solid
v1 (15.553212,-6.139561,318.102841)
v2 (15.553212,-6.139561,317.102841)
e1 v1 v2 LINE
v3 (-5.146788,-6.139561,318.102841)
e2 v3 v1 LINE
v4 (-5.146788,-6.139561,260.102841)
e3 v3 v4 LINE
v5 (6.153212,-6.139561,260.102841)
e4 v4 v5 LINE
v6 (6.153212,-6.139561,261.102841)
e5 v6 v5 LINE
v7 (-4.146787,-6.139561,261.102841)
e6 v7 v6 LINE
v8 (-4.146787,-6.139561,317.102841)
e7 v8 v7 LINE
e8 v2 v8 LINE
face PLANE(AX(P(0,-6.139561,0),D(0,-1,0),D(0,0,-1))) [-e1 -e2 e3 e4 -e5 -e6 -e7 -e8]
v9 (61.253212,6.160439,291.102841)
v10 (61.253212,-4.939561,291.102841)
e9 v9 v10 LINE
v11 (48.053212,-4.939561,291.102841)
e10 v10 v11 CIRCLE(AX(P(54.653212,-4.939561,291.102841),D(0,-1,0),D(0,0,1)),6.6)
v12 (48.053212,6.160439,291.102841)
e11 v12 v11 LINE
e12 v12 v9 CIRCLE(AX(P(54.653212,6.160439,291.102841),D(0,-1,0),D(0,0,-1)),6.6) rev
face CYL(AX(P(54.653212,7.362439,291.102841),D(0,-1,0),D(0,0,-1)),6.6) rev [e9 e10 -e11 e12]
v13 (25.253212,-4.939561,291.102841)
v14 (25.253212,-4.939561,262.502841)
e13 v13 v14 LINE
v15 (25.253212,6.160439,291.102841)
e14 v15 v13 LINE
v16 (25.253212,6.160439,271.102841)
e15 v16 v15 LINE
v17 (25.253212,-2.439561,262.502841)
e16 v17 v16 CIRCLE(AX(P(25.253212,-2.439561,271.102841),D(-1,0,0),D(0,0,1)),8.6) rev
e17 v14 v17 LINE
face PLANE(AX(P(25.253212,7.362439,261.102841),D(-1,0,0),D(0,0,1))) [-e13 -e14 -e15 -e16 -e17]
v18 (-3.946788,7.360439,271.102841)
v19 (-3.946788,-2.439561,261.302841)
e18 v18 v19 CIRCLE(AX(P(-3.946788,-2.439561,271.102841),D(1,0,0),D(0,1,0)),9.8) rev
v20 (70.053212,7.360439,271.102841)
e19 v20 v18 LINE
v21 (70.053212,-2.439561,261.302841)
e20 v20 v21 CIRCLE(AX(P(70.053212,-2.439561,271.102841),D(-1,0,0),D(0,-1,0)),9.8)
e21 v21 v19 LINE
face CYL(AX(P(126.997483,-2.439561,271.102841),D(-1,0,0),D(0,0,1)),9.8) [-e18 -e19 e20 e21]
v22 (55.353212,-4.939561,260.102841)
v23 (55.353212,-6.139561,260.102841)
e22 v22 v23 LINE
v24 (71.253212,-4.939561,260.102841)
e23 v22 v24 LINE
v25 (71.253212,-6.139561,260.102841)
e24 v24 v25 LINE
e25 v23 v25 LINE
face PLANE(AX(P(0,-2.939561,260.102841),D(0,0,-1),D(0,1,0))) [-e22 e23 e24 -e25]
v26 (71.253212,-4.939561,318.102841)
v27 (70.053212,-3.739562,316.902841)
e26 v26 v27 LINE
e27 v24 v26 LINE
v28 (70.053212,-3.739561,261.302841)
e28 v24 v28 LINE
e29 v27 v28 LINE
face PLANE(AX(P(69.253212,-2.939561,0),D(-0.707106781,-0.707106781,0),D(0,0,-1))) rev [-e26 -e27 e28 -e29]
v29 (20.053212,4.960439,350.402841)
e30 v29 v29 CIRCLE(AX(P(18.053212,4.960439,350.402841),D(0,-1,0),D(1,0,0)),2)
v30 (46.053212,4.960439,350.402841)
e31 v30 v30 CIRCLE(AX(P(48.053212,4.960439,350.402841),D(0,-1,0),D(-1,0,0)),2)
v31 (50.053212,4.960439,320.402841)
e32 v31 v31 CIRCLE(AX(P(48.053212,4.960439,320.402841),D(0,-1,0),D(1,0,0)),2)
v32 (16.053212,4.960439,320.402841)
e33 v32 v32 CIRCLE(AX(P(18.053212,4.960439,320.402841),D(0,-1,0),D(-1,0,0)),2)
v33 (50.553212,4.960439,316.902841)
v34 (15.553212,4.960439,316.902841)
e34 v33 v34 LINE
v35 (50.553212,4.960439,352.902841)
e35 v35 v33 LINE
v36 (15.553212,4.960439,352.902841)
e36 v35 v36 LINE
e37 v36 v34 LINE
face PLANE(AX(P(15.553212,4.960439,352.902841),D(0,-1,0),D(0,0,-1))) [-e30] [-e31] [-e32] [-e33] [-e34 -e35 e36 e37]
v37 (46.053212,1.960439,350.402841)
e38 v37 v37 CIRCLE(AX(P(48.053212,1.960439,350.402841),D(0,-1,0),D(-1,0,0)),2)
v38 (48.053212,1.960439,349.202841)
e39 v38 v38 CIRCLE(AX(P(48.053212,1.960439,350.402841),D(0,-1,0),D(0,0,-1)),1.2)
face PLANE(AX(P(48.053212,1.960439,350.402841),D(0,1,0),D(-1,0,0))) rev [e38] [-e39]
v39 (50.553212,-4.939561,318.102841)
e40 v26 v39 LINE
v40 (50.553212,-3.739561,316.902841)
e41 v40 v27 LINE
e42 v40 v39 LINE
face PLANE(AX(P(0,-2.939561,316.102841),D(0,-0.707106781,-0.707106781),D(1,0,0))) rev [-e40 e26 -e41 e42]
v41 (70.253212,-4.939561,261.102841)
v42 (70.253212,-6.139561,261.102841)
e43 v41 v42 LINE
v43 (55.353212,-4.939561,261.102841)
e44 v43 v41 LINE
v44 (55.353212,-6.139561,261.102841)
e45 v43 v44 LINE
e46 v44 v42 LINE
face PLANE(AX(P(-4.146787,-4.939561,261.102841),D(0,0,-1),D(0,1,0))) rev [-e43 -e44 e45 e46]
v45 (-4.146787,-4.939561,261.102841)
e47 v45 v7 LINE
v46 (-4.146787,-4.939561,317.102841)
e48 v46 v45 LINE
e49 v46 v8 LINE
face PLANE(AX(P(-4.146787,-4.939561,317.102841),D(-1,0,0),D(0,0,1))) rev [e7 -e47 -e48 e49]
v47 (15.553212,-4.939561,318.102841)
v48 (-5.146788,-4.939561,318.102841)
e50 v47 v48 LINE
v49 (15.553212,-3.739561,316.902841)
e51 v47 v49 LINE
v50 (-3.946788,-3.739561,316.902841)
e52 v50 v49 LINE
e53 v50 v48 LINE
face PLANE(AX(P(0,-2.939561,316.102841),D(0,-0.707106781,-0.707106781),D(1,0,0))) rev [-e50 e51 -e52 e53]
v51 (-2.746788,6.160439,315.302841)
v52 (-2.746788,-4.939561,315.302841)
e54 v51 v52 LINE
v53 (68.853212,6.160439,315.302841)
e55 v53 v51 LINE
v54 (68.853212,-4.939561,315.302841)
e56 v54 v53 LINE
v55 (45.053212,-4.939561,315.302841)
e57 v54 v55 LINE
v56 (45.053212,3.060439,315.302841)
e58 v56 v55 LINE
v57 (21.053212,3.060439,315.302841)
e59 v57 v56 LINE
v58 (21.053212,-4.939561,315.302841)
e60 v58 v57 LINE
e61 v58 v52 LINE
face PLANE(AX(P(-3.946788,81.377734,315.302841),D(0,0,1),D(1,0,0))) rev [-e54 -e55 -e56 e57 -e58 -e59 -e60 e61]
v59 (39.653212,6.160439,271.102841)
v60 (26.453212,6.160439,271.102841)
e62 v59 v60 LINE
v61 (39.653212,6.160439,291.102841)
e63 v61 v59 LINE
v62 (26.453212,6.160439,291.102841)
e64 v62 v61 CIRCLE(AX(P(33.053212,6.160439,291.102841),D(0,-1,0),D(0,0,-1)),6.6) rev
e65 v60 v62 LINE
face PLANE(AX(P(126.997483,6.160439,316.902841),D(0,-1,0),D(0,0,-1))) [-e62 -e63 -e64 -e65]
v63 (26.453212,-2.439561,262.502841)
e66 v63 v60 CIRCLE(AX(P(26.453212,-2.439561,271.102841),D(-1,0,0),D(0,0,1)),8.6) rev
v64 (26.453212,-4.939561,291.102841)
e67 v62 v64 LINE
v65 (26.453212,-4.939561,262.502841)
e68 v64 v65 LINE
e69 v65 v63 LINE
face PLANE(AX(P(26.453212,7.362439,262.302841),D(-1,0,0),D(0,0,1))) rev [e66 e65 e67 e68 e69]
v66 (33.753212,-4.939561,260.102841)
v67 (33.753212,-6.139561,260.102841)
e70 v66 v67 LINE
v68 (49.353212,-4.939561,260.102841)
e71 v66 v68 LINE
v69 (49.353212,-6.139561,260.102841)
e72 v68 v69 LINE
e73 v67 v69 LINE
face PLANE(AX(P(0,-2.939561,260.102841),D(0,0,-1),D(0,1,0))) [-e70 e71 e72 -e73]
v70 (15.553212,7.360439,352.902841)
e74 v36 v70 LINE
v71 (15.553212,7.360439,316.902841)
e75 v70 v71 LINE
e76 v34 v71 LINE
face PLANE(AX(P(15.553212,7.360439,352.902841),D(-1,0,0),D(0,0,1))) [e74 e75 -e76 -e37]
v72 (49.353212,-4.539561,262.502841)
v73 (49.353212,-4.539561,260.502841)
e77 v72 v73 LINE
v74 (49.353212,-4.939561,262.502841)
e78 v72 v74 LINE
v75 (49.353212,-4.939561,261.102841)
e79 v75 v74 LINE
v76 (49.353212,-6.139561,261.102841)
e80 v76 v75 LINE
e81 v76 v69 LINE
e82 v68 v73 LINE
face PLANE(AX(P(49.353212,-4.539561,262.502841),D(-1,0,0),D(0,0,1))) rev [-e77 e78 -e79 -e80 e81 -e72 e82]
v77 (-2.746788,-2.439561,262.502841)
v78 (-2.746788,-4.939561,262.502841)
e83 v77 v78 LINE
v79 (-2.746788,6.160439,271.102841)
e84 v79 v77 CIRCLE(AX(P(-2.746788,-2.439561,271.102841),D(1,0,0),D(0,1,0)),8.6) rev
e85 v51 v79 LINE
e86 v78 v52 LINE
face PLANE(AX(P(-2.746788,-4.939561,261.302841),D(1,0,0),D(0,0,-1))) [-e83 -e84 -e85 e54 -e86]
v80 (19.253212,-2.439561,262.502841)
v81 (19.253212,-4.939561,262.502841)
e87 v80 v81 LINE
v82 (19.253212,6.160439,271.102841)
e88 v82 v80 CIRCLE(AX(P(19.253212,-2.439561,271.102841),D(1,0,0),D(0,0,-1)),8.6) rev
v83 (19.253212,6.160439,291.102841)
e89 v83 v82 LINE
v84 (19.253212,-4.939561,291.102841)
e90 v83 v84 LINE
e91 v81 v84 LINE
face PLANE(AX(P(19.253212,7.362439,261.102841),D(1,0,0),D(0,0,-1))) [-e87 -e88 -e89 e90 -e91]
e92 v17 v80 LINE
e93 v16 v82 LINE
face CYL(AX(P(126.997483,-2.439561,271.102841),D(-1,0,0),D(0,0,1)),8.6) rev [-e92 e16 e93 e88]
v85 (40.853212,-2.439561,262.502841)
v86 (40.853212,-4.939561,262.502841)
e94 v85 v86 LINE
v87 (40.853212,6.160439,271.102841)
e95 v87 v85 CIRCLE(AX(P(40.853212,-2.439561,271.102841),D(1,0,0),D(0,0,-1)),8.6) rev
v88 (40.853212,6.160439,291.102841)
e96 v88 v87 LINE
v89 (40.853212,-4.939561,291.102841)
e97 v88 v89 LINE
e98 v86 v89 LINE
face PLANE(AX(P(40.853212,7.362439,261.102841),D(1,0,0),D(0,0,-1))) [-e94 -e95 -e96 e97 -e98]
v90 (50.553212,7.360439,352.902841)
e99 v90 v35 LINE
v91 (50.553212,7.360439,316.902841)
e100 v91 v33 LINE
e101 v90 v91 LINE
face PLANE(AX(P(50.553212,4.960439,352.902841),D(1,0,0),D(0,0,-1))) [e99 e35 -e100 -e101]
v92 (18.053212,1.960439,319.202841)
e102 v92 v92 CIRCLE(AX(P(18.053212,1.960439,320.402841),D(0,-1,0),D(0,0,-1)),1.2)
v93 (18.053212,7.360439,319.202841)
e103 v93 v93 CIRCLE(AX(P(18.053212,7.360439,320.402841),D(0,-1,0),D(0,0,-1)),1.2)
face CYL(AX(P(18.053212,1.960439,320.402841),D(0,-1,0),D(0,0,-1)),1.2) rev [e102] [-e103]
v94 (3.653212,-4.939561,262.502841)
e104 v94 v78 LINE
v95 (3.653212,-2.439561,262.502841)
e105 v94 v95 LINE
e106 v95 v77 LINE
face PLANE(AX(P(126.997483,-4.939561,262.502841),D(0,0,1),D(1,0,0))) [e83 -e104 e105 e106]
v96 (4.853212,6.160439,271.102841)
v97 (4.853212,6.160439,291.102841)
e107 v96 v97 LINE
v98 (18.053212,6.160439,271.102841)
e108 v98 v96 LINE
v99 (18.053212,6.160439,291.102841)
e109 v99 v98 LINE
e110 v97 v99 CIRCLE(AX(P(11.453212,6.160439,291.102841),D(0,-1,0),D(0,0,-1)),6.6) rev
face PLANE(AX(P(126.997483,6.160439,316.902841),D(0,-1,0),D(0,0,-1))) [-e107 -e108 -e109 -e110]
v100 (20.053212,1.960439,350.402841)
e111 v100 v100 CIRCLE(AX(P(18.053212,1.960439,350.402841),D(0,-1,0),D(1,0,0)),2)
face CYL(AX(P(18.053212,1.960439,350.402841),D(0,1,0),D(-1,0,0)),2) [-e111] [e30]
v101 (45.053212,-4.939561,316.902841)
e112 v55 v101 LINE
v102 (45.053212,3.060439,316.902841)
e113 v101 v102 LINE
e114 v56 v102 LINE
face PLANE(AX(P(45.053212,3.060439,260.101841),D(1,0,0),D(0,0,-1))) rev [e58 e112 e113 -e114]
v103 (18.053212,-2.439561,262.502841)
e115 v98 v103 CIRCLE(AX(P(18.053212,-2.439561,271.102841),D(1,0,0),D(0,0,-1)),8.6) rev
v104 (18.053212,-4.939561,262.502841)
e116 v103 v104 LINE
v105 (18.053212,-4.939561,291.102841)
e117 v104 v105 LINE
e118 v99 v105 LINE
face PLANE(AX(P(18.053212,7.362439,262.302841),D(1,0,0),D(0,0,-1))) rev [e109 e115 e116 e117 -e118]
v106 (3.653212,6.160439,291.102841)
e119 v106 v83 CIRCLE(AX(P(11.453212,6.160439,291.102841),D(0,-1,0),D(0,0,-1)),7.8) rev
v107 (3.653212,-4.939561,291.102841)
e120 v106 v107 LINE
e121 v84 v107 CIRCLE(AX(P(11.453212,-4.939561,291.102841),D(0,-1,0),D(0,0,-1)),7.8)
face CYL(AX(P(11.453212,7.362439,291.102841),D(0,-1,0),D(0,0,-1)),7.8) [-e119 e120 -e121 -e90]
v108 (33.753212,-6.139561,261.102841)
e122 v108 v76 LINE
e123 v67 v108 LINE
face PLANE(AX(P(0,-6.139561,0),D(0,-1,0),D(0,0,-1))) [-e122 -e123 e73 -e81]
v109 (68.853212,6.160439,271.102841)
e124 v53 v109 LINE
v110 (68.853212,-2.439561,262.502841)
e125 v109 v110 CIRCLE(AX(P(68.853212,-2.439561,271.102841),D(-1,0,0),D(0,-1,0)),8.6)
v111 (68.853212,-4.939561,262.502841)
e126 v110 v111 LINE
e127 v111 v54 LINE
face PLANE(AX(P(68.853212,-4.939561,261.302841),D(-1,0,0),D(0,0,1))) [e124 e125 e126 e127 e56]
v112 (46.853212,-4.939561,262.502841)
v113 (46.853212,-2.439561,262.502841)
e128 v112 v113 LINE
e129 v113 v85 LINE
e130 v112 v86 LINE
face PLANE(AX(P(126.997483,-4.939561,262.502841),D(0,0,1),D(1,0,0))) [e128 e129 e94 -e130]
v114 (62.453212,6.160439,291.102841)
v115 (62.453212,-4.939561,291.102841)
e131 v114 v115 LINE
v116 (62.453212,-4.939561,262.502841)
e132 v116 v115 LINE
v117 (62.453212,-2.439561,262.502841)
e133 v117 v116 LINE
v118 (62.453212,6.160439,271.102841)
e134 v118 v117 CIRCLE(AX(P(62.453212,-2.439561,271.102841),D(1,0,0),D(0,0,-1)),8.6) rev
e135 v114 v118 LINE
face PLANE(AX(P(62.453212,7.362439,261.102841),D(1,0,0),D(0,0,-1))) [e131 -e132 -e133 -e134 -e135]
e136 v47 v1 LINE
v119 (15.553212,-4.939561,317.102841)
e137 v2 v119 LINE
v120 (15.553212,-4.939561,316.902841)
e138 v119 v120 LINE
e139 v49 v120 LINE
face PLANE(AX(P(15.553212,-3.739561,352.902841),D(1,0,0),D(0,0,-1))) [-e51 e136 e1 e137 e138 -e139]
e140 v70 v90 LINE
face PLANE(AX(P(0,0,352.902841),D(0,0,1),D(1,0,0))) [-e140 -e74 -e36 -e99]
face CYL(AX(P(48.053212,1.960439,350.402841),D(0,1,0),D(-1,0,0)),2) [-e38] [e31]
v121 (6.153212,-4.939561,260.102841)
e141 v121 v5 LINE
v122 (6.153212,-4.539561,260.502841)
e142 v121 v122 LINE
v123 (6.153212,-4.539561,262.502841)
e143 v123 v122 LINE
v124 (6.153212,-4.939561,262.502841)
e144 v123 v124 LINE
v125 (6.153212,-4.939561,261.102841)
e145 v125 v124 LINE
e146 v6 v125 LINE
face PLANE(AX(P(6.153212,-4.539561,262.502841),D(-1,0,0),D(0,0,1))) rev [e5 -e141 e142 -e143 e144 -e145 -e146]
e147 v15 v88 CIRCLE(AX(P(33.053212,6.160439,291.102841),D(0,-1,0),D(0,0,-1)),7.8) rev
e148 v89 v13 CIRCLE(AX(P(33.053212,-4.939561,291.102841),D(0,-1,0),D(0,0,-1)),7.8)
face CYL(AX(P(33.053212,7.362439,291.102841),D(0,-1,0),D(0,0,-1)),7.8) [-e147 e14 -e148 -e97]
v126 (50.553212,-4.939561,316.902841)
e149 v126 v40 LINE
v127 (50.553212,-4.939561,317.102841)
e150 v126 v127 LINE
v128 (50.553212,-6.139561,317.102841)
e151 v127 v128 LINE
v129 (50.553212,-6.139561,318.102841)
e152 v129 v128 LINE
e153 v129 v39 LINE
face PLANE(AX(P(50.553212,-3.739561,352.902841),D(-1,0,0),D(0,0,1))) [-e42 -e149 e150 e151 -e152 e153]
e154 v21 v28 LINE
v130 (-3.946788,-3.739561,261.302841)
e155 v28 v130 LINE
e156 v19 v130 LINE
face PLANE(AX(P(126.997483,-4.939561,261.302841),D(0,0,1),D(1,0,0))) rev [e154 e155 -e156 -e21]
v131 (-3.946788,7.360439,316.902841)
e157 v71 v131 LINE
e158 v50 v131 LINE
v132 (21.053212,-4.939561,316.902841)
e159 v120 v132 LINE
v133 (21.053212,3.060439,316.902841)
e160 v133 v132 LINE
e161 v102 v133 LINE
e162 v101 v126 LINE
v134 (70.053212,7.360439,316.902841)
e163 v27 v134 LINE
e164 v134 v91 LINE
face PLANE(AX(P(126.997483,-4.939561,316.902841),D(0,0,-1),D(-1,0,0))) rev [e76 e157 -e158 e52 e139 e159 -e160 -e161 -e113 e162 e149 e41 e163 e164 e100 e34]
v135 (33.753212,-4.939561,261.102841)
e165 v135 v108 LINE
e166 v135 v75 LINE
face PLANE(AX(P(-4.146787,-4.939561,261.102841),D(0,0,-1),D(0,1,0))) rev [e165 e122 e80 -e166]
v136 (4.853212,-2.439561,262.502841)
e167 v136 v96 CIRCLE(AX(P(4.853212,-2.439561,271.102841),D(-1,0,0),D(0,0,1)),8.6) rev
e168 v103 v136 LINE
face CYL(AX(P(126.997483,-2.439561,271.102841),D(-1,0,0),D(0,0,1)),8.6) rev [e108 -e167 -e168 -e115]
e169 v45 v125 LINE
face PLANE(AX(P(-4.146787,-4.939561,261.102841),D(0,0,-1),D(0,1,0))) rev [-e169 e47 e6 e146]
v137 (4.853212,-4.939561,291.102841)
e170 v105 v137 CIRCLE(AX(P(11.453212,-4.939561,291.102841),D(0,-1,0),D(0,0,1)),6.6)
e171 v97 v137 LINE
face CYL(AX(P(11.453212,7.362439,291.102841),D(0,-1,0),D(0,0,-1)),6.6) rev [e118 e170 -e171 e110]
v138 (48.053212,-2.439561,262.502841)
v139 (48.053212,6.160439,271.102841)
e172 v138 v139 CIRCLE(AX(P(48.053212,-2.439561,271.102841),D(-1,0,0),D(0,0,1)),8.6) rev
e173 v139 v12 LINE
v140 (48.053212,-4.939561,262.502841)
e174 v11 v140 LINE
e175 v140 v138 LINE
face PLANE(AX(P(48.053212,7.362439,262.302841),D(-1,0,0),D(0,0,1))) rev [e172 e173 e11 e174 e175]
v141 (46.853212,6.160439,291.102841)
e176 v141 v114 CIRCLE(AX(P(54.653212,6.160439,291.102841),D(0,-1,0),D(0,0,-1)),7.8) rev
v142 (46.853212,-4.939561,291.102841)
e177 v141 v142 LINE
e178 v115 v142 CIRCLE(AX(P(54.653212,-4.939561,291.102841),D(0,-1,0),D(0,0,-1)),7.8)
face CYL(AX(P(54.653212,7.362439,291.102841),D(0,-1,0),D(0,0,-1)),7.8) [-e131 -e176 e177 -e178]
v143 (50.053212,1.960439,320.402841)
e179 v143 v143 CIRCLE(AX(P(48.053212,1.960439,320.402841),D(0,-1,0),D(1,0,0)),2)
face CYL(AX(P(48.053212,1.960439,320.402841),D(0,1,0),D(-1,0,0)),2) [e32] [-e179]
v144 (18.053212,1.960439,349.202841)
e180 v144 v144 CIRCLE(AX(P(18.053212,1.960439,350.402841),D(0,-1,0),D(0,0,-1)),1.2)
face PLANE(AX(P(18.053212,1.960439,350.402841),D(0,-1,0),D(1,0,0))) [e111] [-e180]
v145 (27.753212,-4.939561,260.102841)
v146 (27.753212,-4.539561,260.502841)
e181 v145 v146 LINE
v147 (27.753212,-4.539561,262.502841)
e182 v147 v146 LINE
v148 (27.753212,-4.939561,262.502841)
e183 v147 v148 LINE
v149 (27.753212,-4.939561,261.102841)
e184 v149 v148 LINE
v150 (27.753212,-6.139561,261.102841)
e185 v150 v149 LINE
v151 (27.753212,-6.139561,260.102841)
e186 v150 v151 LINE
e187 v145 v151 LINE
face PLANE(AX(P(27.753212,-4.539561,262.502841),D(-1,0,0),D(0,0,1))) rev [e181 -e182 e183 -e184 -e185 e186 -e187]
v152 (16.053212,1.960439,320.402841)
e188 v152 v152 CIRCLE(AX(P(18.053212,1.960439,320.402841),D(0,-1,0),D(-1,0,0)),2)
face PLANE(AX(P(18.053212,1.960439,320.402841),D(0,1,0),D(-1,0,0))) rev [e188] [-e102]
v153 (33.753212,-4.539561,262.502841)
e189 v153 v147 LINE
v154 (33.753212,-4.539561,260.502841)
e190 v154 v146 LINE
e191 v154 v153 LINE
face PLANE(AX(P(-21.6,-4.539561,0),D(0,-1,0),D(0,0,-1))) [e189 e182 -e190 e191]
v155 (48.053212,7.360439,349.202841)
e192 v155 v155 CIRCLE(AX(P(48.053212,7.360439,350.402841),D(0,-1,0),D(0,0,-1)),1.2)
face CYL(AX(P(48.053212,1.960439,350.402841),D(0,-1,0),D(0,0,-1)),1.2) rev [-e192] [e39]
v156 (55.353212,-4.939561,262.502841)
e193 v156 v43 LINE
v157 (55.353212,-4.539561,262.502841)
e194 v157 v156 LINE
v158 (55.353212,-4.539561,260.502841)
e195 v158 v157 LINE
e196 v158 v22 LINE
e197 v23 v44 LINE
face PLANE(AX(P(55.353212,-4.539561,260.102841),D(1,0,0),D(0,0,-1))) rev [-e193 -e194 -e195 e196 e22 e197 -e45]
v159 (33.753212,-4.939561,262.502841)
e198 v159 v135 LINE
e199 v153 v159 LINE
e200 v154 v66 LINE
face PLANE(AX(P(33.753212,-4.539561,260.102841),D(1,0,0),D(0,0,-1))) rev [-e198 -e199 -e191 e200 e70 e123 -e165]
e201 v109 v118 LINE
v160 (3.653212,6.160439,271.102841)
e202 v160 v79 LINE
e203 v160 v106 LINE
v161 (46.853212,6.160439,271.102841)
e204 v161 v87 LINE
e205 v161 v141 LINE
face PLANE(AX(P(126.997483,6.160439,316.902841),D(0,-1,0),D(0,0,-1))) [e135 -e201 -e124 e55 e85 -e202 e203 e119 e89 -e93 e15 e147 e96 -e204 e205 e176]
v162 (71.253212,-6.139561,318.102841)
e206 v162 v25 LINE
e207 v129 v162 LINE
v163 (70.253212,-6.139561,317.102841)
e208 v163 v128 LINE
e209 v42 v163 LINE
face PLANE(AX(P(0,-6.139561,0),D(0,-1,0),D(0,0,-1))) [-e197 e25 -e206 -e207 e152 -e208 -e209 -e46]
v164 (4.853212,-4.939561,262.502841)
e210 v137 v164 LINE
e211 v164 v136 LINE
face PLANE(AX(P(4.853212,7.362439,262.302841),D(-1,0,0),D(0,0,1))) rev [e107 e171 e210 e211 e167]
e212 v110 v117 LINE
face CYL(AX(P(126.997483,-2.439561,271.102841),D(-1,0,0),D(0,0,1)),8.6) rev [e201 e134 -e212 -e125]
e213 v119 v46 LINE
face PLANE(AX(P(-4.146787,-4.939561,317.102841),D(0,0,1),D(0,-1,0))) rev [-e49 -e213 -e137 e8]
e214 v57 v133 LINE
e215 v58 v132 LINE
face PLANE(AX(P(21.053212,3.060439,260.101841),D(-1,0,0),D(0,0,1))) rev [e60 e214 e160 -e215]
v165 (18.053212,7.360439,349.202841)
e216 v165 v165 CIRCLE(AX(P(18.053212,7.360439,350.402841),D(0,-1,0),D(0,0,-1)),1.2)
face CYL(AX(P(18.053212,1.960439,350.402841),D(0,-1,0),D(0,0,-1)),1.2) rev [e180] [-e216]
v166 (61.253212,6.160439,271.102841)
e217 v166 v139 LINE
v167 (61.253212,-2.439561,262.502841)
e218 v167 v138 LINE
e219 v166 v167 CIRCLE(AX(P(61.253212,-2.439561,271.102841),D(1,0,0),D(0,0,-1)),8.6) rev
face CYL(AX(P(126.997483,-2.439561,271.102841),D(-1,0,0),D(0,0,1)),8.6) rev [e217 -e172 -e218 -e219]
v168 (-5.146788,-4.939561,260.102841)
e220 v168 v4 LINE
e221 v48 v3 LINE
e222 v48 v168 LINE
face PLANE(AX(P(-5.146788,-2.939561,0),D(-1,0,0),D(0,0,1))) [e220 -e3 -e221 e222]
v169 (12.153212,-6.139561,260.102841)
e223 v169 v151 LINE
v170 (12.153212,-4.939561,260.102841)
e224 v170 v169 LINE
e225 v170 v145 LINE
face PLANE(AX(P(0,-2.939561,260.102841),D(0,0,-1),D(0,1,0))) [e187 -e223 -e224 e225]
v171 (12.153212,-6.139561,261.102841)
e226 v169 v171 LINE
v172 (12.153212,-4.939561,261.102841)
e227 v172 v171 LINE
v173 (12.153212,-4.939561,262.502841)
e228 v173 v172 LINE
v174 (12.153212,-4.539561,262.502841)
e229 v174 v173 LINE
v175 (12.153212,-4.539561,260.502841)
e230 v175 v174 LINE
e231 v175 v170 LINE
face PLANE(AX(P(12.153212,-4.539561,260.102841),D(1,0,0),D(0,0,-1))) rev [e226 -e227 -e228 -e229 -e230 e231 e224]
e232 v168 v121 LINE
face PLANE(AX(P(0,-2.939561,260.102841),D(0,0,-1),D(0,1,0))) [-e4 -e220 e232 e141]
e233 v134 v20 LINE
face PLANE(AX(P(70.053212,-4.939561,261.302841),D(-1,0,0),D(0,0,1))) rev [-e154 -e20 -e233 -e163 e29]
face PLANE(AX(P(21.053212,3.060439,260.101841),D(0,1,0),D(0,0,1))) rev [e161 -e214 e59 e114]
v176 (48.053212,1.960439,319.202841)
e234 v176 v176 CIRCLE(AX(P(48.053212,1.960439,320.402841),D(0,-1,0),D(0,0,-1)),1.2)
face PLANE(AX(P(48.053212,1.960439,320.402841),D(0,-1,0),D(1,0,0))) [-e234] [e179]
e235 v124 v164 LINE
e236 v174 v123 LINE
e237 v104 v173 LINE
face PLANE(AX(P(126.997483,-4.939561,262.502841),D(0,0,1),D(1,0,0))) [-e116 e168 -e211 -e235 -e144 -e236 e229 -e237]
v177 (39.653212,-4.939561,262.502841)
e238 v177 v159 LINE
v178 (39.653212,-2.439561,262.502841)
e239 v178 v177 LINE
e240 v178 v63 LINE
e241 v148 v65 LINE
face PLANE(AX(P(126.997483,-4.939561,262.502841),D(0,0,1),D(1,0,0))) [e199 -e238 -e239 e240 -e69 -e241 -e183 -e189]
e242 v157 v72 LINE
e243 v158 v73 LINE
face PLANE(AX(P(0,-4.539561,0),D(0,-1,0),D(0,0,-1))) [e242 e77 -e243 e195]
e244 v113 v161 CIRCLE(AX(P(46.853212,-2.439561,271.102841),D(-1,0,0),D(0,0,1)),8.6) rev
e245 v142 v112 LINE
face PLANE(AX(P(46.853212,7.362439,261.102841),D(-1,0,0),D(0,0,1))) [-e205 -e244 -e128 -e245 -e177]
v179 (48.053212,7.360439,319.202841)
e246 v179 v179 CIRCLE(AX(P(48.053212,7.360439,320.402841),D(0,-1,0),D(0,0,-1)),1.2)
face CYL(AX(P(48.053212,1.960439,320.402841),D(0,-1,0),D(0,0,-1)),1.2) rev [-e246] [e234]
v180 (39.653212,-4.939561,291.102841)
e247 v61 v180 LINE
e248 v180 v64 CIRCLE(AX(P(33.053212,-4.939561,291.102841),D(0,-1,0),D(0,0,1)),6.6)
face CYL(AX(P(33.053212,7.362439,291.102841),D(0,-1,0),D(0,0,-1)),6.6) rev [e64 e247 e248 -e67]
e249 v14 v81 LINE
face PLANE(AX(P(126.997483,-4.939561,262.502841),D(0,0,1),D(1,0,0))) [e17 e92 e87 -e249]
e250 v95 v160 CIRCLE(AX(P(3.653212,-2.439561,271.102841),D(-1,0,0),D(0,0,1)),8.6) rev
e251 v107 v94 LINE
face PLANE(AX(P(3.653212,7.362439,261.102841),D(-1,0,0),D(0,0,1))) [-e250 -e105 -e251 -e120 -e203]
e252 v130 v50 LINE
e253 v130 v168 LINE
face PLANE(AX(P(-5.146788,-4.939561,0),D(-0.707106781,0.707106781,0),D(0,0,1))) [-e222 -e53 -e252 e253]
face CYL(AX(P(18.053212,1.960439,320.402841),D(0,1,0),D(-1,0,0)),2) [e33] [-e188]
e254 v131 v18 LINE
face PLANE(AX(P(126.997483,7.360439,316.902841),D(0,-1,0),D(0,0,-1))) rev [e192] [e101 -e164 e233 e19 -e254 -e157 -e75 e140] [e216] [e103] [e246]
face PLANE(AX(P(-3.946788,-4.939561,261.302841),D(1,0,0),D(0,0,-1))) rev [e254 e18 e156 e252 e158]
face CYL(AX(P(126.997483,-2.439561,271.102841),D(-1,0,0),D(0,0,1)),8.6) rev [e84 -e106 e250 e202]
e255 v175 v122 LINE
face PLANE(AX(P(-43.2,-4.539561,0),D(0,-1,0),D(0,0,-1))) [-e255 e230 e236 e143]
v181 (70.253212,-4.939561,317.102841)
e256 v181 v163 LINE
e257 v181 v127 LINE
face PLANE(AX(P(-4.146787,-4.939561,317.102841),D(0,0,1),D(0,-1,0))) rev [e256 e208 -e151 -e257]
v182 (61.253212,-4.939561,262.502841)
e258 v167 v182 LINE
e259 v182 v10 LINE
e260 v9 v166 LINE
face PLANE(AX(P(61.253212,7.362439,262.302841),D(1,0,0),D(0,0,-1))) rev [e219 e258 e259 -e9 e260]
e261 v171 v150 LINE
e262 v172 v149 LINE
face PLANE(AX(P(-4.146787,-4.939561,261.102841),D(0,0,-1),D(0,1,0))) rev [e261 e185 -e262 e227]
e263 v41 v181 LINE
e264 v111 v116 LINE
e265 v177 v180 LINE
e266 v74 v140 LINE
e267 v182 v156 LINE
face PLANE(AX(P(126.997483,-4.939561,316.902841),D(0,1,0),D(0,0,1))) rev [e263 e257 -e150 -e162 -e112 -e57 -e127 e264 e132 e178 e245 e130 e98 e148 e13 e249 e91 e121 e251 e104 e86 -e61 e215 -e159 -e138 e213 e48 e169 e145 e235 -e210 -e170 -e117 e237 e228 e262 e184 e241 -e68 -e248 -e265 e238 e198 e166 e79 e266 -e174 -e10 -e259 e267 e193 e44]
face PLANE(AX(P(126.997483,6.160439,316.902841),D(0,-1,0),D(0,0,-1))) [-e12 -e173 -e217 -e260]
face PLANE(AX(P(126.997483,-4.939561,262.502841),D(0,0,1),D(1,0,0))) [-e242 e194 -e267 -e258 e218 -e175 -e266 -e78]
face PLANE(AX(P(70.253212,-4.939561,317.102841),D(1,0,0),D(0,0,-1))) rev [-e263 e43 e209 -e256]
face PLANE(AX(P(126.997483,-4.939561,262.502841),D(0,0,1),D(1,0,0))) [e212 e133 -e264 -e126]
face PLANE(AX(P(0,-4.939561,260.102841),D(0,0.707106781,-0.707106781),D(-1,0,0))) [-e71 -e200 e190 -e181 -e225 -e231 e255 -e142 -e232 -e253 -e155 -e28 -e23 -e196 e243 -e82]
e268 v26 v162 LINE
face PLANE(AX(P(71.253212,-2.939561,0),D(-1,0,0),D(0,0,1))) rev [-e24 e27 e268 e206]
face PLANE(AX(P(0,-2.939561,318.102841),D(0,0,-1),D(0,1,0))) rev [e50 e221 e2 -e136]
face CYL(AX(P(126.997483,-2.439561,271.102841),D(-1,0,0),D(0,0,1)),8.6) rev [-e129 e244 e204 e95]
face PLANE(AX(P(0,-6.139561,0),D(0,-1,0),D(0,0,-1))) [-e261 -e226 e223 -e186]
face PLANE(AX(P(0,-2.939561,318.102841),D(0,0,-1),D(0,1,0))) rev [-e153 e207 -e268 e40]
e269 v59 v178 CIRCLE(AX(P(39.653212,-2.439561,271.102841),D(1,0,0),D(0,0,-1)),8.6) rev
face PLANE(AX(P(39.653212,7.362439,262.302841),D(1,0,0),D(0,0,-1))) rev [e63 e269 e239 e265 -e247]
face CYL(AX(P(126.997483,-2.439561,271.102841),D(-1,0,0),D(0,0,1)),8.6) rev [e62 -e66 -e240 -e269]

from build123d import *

# Parameters (mm, degrees)
BODY_DEPTH              = 70.053212
BODY_DEPTH_BACK         = 3.946788
SHELL1_T                = -1.2
SKETCH7_W               = 74
SKETCH7_H               = 1.6
BACK_WALL_DEPTH         = 12.3
SKETCH8_W               = 35
SKETCH8_H               = 2.4
FAN_MOUNT_DEPTH         = 36
SKETCH12_R              = 2
FAN_BOSS_DEPTH          = 3
M2_CLEARANCE_HOLE2_D    = 2.4
EDGE_START              = -2
EDGE_FLANGE_OUTLINE_W   = 76.399999565
EDGE_FLANGE_OUTLINE_H   = 58
EDGE_FLANGE_OUTLINE_W_2 = 74
EDGE_FLANGE_OUTLINE_H_2 = 55.6
EDGE_FLANGE_DEPTH       = 3.2
CHAMFER1_SIZE           = 2
SKETCH18_W              = 74.39999908
SKETCH18_H              = 56
BOX_RECESS_DEPTH        = 1.2
FAN_OPENING_REACH       = 93.419
SKETCH15_W              = 24
SKETCH15_H              = 8
SKETCH19_W              = 35
SKETCH19_H              = 2.4
FAN_RELIEF_DEPTH        = 92.419014649
AIR_CHANNEL_REACH       = 362.234
SKETCH20_W              = 6
SKETCH20_H              = 2.4
CLIP_RELIEF_DEPTH       = 1.6
LPATTERN2_COUNT         = 3
LPATTERN2_PITCH         = 21.6


# Read off the part's stored shape, not the designer's step: edge flange
with BuildPart() as part:
    # Sketch1 → body (new, two sides: drawn at the far end of the back side and taken through both)
    with BuildSketch(Plane(origin=(0, 0, 0), x_dir=(0, 0, -1), z_dir=(1, 0, 0)).offset(-BODY_DEPTH_BACK)):
        with BuildLine():
            Line((-316.902840602, -4.939561402), (-261.302840602, -4.939561402))
            Line((-261.302840602, -4.939561402), (-261.302840602, -2.439561402))
            ThreePointArc((-261.302840602, -2.439561402), (-264.173194146, 4.490085054), (-271.102840602, 7.360438598))
            Line((-271.102840602, 7.360438598), (-316.902840602, 7.360438598))
            Line((-316.902840602, 7.360438598), (-316.902840602, -4.939561402))
        make_face()
    extrude(amount=BODY_DEPTH + BODY_DEPTH_BACK)

    # Shell1
    shell1_openings = [part.faces().sort_by_distance(p)[0] for p in [
        (33.053212, -4.939561402, 289.102840602),
        (33.053212, 1.210438598, 316.902840602),
    ]]
    offset(amount=SHELL1_T, openings=shell1_openings, kind=Kind.INTERSECTION)

    # Sketch7 → back wall (add)
    with BuildSketch(Plane(origin=(0, -4.939561402, 0), x_dir=(1, 0, 0), z_dir=(0, 1, 0))):
        with Locations((33.053212174, -316.102840602)):
            Rectangle(SKETCH7_W, SKETCH7_H)
    extrude(amount=BACK_WALL_DEPTH)

    # Sketch8 → fan mount (add)
    with BuildSketch(Plane(origin=(0, 0, 316.902840602), x_dir=(-1, 0, 0), z_dir=(0, 0, -1))):
        with Locations((-33.053212174, 6.160438598)):
            Rectangle(SKETCH8_W, SKETCH8_H)
    extrude(amount=-FAN_MOUNT_DEPTH)

    # Sketch12 → fan boss (add)
    with BuildSketch(Plane.XZ.offset(-4.960438598)):
        with Locations((18.053212174, 350.402840602)):
            Circle(SKETCH12_R)
        with Locations(Location((18.053212174, 320.402840602, 0), (0, 0, 180))):
            Circle(SKETCH12_R)
        with Locations(Location((48.053212174, 350.402840602, 0), (0, 0, 180))):
            Circle(SKETCH12_R)
        with Locations((48.053212174, 320.402840602)):
            Circle(SKETCH12_R)
    extrude(amount=FAN_BOSS_DEPTH)

    # M2 Clearance Hole2 (through all)
    with Locations(Plane(origin=(0, 1.960438598, 0), x_dir=(-1, 0, 0), z_dir=(0, -1, 0))):
        with Locations((-18.053212174, -320.402840602), (-18.053212174, -350.402840602), (-48.053212174, -350.402840602), (-48.053212174, -320.402840602)):
            Hole(M2_CLEARANCE_HOLE2_D / 2)

    # edge flange outline → edge flange (add)
    with BuildSketch(Plane.XZ.offset(4.939561402).offset(EDGE_START)):
        with Locations((33.053211957, 289.102840602)):
            Rectangle(EDGE_FLANGE_OUTLINE_W, EDGE_FLANGE_OUTLINE_H)
        with Locations((33.053212174, 289.102840602)):
            Rectangle(EDGE_FLANGE_OUTLINE_W_2, EDGE_FLANGE_OUTLINE_H_2, mode=Mode.SUBTRACT)
    extrude(amount=EDGE_FLANGE_DEPTH)

    # Chamfer1
    # the kernel refuses this chamfer: 2 mm, written as the material it takes off along each edge
    with BuildSketch(Plane(origin=(76.396577715, -2.939561402, 318.102840602), x_dir=(0, 0.027495876610586605, -0.9996219169112968), z_dir=(-1, 0, 0))) as chamfer1_piece_1_section:
        Polygon((CHAMFER1_SIZE * 0.999621916911, CHAMFER1_SIZE * 0.0274958766106), (-CHAMFER1_SIZE * 0.0274958766106, CHAMFER1_SIZE * 0.999621916911), (0, 0), align=None)
    chamfer1_piece_1 = extrude(amount=86.686731517, mode=Mode.PRIVATE)
    chamfer1_piece_1 = split(chamfer1_piece_1, bisect_by=Plane(origin=(70.053212, -3.160856778, 316.605391079), z_dir=(1, 0, 0)), keep=Keep.TOP, mode=Mode.PRIVATE)
    chamfer1_piece_1 = split(chamfer1_piece_1, bisect_by=Plane(origin=(73.224894857, -3.160856778, 316.902840602), z_dir=(0, 0, -1)), keep=Keep.TOP, mode=Mode.PRIVATE)
    add(chamfer1_piece_1, mode=Mode.SUBTRACT)
    with BuildSketch(Plane(origin=(76.396577715, -2.939561402, 318.102840602), x_dir=(0, 0.027495876610586605, -0.9996219169112968), z_dir=(-1, 0, 0))) as chamfer1_piece_2_section:
        Polygon((CHAMFER1_SIZE * 0.999621916911, CHAMFER1_SIZE * 0.0274958766106), (-CHAMFER1_SIZE * 0.0274958766106, CHAMFER1_SIZE * 0.999621916911), (0, 0), align=None)
    chamfer1_piece_2 = extrude(amount=86.686731517, mode=Mode.PRIVATE)
    chamfer1_piece_2 = split(chamfer1_piece_2, bisect_by=Plane(origin=(70.053212, -3.689580321, 317.616127372), z_dir=(1, 0, 0)), keep=Keep.TOP, mode=Mode.PRIVATE)
    chamfer1_piece_2 = split(chamfer1_piece_2, bisect_by=Plane(origin=(73.224894857, -3.689580321, 316.902840602), z_dir=(0, 0, 1)), keep=Keep.TOP, mode=Mode.PRIVATE)
    add(chamfer1_piece_2, mode=Mode.SUBTRACT)
    with BuildSketch(Plane(origin=(76.396577715, -2.939561402, 318.102840602), x_dir=(0, 0.027495876610586605, -0.9996219169112968), z_dir=(-1, 0, 0))) as chamfer1_piece_3_section:
        Polygon((CHAMFER1_SIZE * 0.999621916911, CHAMFER1_SIZE * 0.0274958766106), (-CHAMFER1_SIZE * 0.0274958766106, CHAMFER1_SIZE * 0.999621916911), (0, 0), align=None)
    chamfer1_piece_3 = extrude(amount=86.686731517, mode=Mode.PRIVATE)
    chamfer1_piece_3 = split(chamfer1_piece_3, bisect_by=Plane(origin=(70.053212, -3.689580321, 317.616127372), z_dir=(-1, 0, 0)), keep=Keep.TOP, mode=Mode.PRIVATE)
    chamfer1_piece_3 = split(chamfer1_piece_3, bisect_by=Plane(origin=(-3.946788, -3.689580321, 317.616127372), z_dir=(1, 0, 0)), keep=Keep.TOP, mode=Mode.PRIVATE)
    chamfer1_piece_3 = split(chamfer1_piece_3, bisect_by=Plane(origin=(33.053212, -3.689580321, 316.902840602), z_dir=(0, 0, 1)), keep=Keep.TOP, mode=Mode.PRIVATE)
    add(chamfer1_piece_3, mode=Mode.SUBTRACT)
    with BuildSketch(Plane(origin=(76.396577715, -2.939561402, 318.102840602), x_dir=(0, 0.027495876610586605, -0.9996219169112968), z_dir=(-1, 0, 0))) as chamfer1_piece_4_section:
        Polygon((CHAMFER1_SIZE * 0.999621916911, CHAMFER1_SIZE * 0.0274958766106), (-CHAMFER1_SIZE * 0.0274958766106, CHAMFER1_SIZE * 0.999621916911), (0, 0), align=None)
    chamfer1_piece_4 = extrude(amount=86.686731517, mode=Mode.PRIVATE)
    chamfer1_piece_4 = split(chamfer1_piece_4, bisect_by=Plane(origin=(-3.946788, -3.160856778, 316.605391079), z_dir=(-1, 0, 0)), keep=Keep.TOP, mode=Mode.PRIVATE)
    chamfer1_piece_4 = split(chamfer1_piece_4, bisect_by=Plane(origin=(-7.118470901, -3.160856778, 316.902840602), z_dir=(0, 0, -1)), keep=Keep.TOP, mode=Mode.PRIVATE)
    add(chamfer1_piece_4, mode=Mode.SUBTRACT)
    with BuildSketch(Plane(origin=(76.396577715, -2.939561402, 318.102840602), x_dir=(0, 0.027495876610586605, -0.9996219169112968), z_dir=(-1, 0, 0))) as chamfer1_piece_5_section:
        Polygon((CHAMFER1_SIZE * 0.999621916911, CHAMFER1_SIZE * 0.0274958766106), (-CHAMFER1_SIZE * 0.0274958766106, CHAMFER1_SIZE * 0.999621916911), (0, 0), align=None)
    chamfer1_piece_5 = extrude(amount=86.686731517, mode=Mode.PRIVATE)
    chamfer1_piece_5 = split(chamfer1_piece_5, bisect_by=Plane(origin=(-3.946788, -3.689580321, 317.616127372), z_dir=(-1, 0, 0)), keep=Keep.TOP, mode=Mode.PRIVATE)
    chamfer1_piece_5 = split(chamfer1_piece_5, bisect_by=Plane(origin=(-7.118470901, -3.689580321, 316.902840602), z_dir=(0, 0, 1)), keep=Keep.TOP, mode=Mode.PRIVATE)
    add(chamfer1_piece_5, mode=Mode.SUBTRACT)
    with BuildSketch(Plane(origin=(71.253211739, -2.939561402, 254.959474626), x_dir=(-0.9996219169112968, 0.0274958766105862, 0), z_dir=(0, 0, 1))) as chamfer1_piece_6_section:
        Polygon((CHAMFER1_SIZE * 0.999621916911, CHAMFER1_SIZE * 0.0274958766106), (-CHAMFER1_SIZE * 0.0274958766106, CHAMFER1_SIZE * 0.999621916911), (0, 0), align=None)
    chamfer1_piece_6 = extrude(amount=68.286731952, mode=Mode.PRIVATE)
    chamfer1_piece_6 = split(chamfer1_piece_6, bisect_by=Plane(origin=(70.053212, -3.160856869, 258.131157614), z_dir=(-1, 0, 0)), keep=Keep.TOP, mode=Mode.PRIVATE)
    chamfer1_piece_6 = split(chamfer1_piece_6, bisect_by=Plane(origin=(69.75576239, -3.160856869, 261.302840602), z_dir=(0, 0, -1)), keep=Keep.TOP, mode=Mode.PRIVATE)
    add(chamfer1_piece_6, mode=Mode.SUBTRACT)
    with BuildSketch(Plane(origin=(71.253211739, -2.939561402, 254.959474626), x_dir=(-0.9996219169112968, 0.0274958766105862, 0), z_dir=(0, 0, 1))) as chamfer1_piece_7_section:
        Polygon((CHAMFER1_SIZE * 0.999621916911, CHAMFER1_SIZE * 0.0274958766106), (-CHAMFER1_SIZE * 0.0274958766106, CHAMFER1_SIZE * 0.999621916911), (0, 0), align=None)
    chamfer1_piece_7 = extrude(amount=68.286731952, mode=Mode.PRIVATE)
    chamfer1_piece_7 = split(chamfer1_piece_7, bisect_by=Plane(origin=(70.053212, -3.689580366, 258.131157614), z_dir=(1, 0, 0)), keep=Keep.TOP, mode=Mode.PRIVATE)
    chamfer1_piece_7 = split(chamfer1_piece_7, bisect_by=Plane(origin=(70.766498595, -3.689580366, 261.302840602), z_dir=(0, 0, -1)), keep=Keep.TOP, mode=Mode.PRIVATE)
    add(chamfer1_piece_7, mode=Mode.SUBTRACT)
    with BuildSketch(Plane(origin=(71.253211739, -2.939561402, 254.959474626), x_dir=(-0.9996219169112968, 0.0274958766105862, 0), z_dir=(0, 0, 1))) as chamfer1_piece_8_section:
        Polygon((CHAMFER1_SIZE * 0.999621916911, CHAMFER1_SIZE * 0.0274958766106), (-CHAMFER1_SIZE * 0.0274958766106, CHAMFER1_SIZE * 0.999621916911), (0, 0), align=None)
    chamfer1_piece_8 = extrude(amount=68.286731952, mode=Mode.PRIVATE)
    chamfer1_piece_8 = split(chamfer1_piece_8, bisect_by=Plane(origin=(70.053212, -3.689580366, 289.102840602), z_dir=(1, 0, 0)), keep=Keep.TOP, mode=Mode.PRIVATE)
    chamfer1_piece_8 = split(chamfer1_piece_8, bisect_by=Plane(origin=(70.766498595, -3.689580366, 316.902840602), z_dir=(0, 0, -1)), keep=Keep.TOP, mode=Mode.PRIVATE)
    chamfer1_piece_8 = split(chamfer1_piece_8, bisect_by=Plane(origin=(70.766498595, -3.689580366, 261.302840602), z_dir=(0, 0, 1)), keep=Keep.TOP, mode=Mode.PRIVATE)
    add(chamfer1_piece_8, mode=Mode.SUBTRACT)
    with BuildSketch(Plane(origin=(71.253211739, -2.939561402, 254.959474626), x_dir=(-0.9996219169112968, 0.0274958766105862, 0), z_dir=(0, 0, 1))) as chamfer1_piece_9_section:
        Polygon((CHAMFER1_SIZE * 0.999621916911, CHAMFER1_SIZE * 0.0274958766106), (-CHAMFER1_SIZE * 0.0274958766106, CHAMFER1_SIZE * 0.999621916911), (0, 0), align=None)
    chamfer1_piece_9 = extrude(amount=68.286731952, mode=Mode.PRIVATE)
    chamfer1_piece_9 = split(chamfer1_piece_9, bisect_by=Plane(origin=(70.053212, -3.160856869, 320.07452359), z_dir=(-1, 0, 0)), keep=Keep.TOP, mode=Mode.PRIVATE)
    chamfer1_piece_9 = split(chamfer1_piece_9, bisect_by=Plane(origin=(69.75576239, -3.160856869, 316.902840602), z_dir=(0, 0, 1)), keep=Keep.TOP, mode=Mode.PRIVATE)
    add(chamfer1_piece_9, mode=Mode.SUBTRACT)
    with BuildSketch(Plane(origin=(71.253211739, -2.939561402, 254.959474626), x_dir=(-0.9996219169112968, 0.0274958766105862, 0), z_dir=(0, 0, 1))) as chamfer1_piece_10_section:
        Polygon((CHAMFER1_SIZE * 0.999621916911, CHAMFER1_SIZE * 0.0274958766106), (-CHAMFER1_SIZE * 0.0274958766106, CHAMFER1_SIZE * 0.999621916911), (0, 0), align=None)
    chamfer1_piece_10 = extrude(amount=68.286731952, mode=Mode.PRIVATE)
    chamfer1_piece_10 = split(chamfer1_piece_10, bisect_by=Plane(origin=(70.053212, -3.689580366, 320.07452359), z_dir=(1, 0, 0)), keep=Keep.TOP, mode=Mode.PRIVATE)
    chamfer1_piece_10 = split(chamfer1_piece_10, bisect_by=Plane(origin=(70.766498595, -3.689580366, 316.902840602), z_dir=(0, 0, 1)), keep=Keep.TOP, mode=Mode.PRIVATE)
    add(chamfer1_piece_10, mode=Mode.SUBTRACT)
    with BuildSketch(Plane(origin=(-10.290153802, -2.939561402, 260.102840602), x_dir=(0, 0.027495876610586174, 0.9996219169112968), z_dir=(1, 0, 0))) as chamfer1_piece_11_section:
        Polygon((CHAMFER1_SIZE * 0.999621916911, CHAMFER1_SIZE * 0.0274958766106), (-CHAMFER1_SIZE * 0.0274958766106, CHAMFER1_SIZE * 0.999621916911), (0, 0), align=None)
    chamfer1_piece_11 = extrude(amount=86.686731517, mode=Mode.PRIVATE)
    chamfer1_piece_11 = split(chamfer1_piece_11, bisect_by=Plane(origin=(-3.946788, -3.160856778, 261.600290125), z_dir=(-1, 0, 0)), keep=Keep.TOP, mode=Mode.PRIVATE)
    chamfer1_piece_11 = split(chamfer1_piece_11, bisect_by=Plane(origin=(-7.118470901, -3.160856778, 261.302840602), z_dir=(0, 0, 1)), keep=Keep.TOP, mode=Mode.PRIVATE)
    add(chamfer1_piece_11, mode=Mode.SUBTRACT)
    with BuildSketch(Plane(origin=(-10.290153802, -2.939561402, 260.102840602), x_dir=(0, 0.027495876610586174, 0.9996219169112968), z_dir=(1, 0, 0))) as chamfer1_piece_12_section:
        Polygon((CHAMFER1_SIZE * 0.999621916911, CHAMFER1_SIZE * 0.0274958766106), (-CHAMFER1_SIZE * 0.0274958766106, CHAMFER1_SIZE * 0.999621916911), (0, 0), align=None)
    chamfer1_piece_12 = extrude(amount=86.686731517, mode=Mode.PRIVATE)
    chamfer1_piece_12 = split(chamfer1_piece_12, bisect_by=Plane(origin=(-3.946788, -3.689580321, 260.589553832), z_dir=(-1, 0, 0)), keep=Keep.TOP, mode=Mode.PRIVATE)
    chamfer1_piece_12 = split(chamfer1_piece_12, bisect_by=Plane(origin=(-7.118470901, -3.689580321, 261.302840602), z_dir=(0, 0, -1)), keep=Keep.TOP, mode=Mode.PRIVATE)
    add(chamfer1_piece_12, mode=Mode.SUBTRACT)
    with BuildSketch(Plane(origin=(-10.290153802, -2.939561402, 260.102840602), x_dir=(0, 0.027495876610586174, 0.9996219169112968), z_dir=(1, 0, 0))) as chamfer1_piece_13_section:
        Polygon((CHAMFER1_SIZE * 0.999621916911, CHAMFER1_SIZE * 0.0274958766106), (-CHAMFER1_SIZE * 0.0274958766106, CHAMFER1_SIZE * 0.999621916911), (0, 0), align=None)
    chamfer1_piece_13 = extrude(amount=86.686731517, mode=Mode.PRIVATE)
    chamfer1_piece_13 = split(chamfer1_piece_13, bisect_by=Plane(origin=(70.053212, -3.689580321, 260.589553832), z_dir=(-1, 0, 0)), keep=Keep.TOP, mode=Mode.PRIVATE)
    chamfer1_piece_13 = split(chamfer1_piece_13, bisect_by=Plane(origin=(-3.946788, -3.689580321, 260.589553832), z_dir=(1, 0, 0)), keep=Keep.TOP, mode=Mode.PRIVATE)
    chamfer1_piece_13 = split(chamfer1_piece_13, bisect_by=Plane(origin=(33.053212, -3.689580321, 261.302840602), z_dir=(0, 0, -1)), keep=Keep.TOP, mode=Mode.PRIVATE)
    add(chamfer1_piece_13, mode=Mode.SUBTRACT)
    with BuildSketch(Plane(origin=(-10.290153802, -2.939561402, 260.102840602), x_dir=(0, 0.027495876610586174, 0.9996219169112968), z_dir=(1, 0, 0))) as chamfer1_piece_14_section:
        Polygon((CHAMFER1_SIZE * 0.999621916911, CHAMFER1_SIZE * 0.0274958766106), (-CHAMFER1_SIZE * 0.0274958766106, CHAMFER1_SIZE * 0.999621916911), (0, 0), align=None)
    chamfer1_piece_14 = extrude(amount=86.686731517, mode=Mode.PRIVATE)
    chamfer1_piece_14 = split(chamfer1_piece_14, bisect_by=Plane(origin=(70.053212, -3.160856778, 261.600290125), z_dir=(1, 0, 0)), keep=Keep.TOP, mode=Mode.PRIVATE)
    chamfer1_piece_14 = split(chamfer1_piece_14, bisect_by=Plane(origin=(73.224894857, -3.160856778, 261.302840602), z_dir=(0, 0, 1)), keep=Keep.TOP, mode=Mode.PRIVATE)
    add(chamfer1_piece_14, mode=Mode.SUBTRACT)
    with BuildSketch(Plane(origin=(-10.290153802, -2.939561402, 260.102840602), x_dir=(0, 0.027495876610586174, 0.9996219169112968), z_dir=(1, 0, 0))) as chamfer1_piece_15_section:
        Polygon((CHAMFER1_SIZE * 0.999621916911, CHAMFER1_SIZE * 0.0274958766106), (-CHAMFER1_SIZE * 0.0274958766106, CHAMFER1_SIZE * 0.999621916911), (0, 0), align=None)
    chamfer1_piece_15 = extrude(amount=86.686731517, mode=Mode.PRIVATE)
    chamfer1_piece_15 = split(chamfer1_piece_15, bisect_by=Plane(origin=(70.053212, -3.689580321, 260.589553832), z_dir=(1, 0, 0)), keep=Keep.TOP, mode=Mode.PRIVATE)
    chamfer1_piece_15 = split(chamfer1_piece_15, bisect_by=Plane(origin=(73.224894857, -3.689580321, 261.302840602), z_dir=(0, 0, -1)), keep=Keep.TOP, mode=Mode.PRIVATE)
    add(chamfer1_piece_15, mode=Mode.SUBTRACT)
    with BuildSketch(Plane(origin=(-5.146787826, -2.939561402, 323.246206578), x_dir=(0.9996219169112968, 0.027495876610586275, 0), z_dir=(0, 0, -1))) as chamfer1_piece_16_section:
        Polygon((CHAMFER1_SIZE * 0.999621916911, CHAMFER1_SIZE * 0.0274958766106), (-CHAMFER1_SIZE * 0.0274958766106, CHAMFER1_SIZE * 0.999621916911), (0, 0), align=None)
    chamfer1_piece_16 = extrude(amount=68.286731952, mode=Mode.PRIVATE)
    chamfer1_piece_16 = split(chamfer1_piece_16, bisect_by=Plane(origin=(-3.946788, -3.160856839, 320.07452359), z_dir=(1, 0, 0)), keep=Keep.TOP, mode=Mode.PRIVATE)
    chamfer1_piece_16 = split(chamfer1_piece_16, bisect_by=Plane(origin=(-3.649338419, -3.160856839, 316.902840602), z_dir=(0, 0, 1)), keep=Keep.TOP, mode=Mode.PRIVATE)
    add(chamfer1_piece_16, mode=Mode.SUBTRACT)
    with BuildSketch(Plane(origin=(-5.146787826, -2.939561402, 323.246206578), x_dir=(0.9996219169112968, 0.027495876610586275, 0), z_dir=(0, 0, -1))) as chamfer1_piece_17_section:
        Polygon((CHAMFER1_SIZE * 0.999621916911, CHAMFER1_SIZE * 0.0274958766106), (-CHAMFER1_SIZE * 0.0274958766106, CHAMFER1_SIZE * 0.999621916911), (0, 0), align=None)
    chamfer1_piece_17 = extrude(amount=68.286731952, mode=Mode.PRIVATE)
    chamfer1_piece_17 = split(chamfer1_piece_17, bisect_by=Plane(origin=(-3.946788, -3.689580351, 320.07452359), z_dir=(-1, 0, 0)), keep=Keep.TOP, mode=Mode.PRIVATE)
    chamfer1_piece_17 = split(chamfer1_piece_17, bisect_by=Plane(origin=(-4.660074654, -3.689580351, 316.902840602), z_dir=(0, 0, 1)), keep=Keep.TOP, mode=Mode.PRIVATE)
    add(chamfer1_piece_17, mode=Mode.SUBTRACT)
    with BuildSketch(Plane(origin=(-5.146787826, -2.939561402, 323.246206578), x_dir=(0.9996219169112968, 0.027495876610586275, 0), z_dir=(0, 0, -1))) as chamfer1_piece_18_section:
        Polygon((CHAMFER1_SIZE * 0.999621916911, CHAMFER1_SIZE * 0.0274958766106), (-CHAMFER1_SIZE * 0.0274958766106, CHAMFER1_SIZE * 0.999621916911), (0, 0), align=None)
    chamfer1_piece_18 = extrude(amount=68.286731952, mode=Mode.PRIVATE)
    chamfer1_piece_18 = split(chamfer1_piece_18, bisect_by=Plane(origin=(-3.946788, -3.689580351, 289.102840602), z_dir=(-1, 0, 0)), keep=Keep.TOP, mode=Mode.PRIVATE)
    chamfer1_piece_18 = split(chamfer1_piece_18, bisect_by=Plane(origin=(-4.660074654, -3.689580351, 316.902840602), z_dir=(0, 0, -1)), keep=Keep.TOP, mode=Mode.PRIVATE)
    chamfer1_piece_18 = split(chamfer1_piece_18, bisect_by=Plane(origin=(-4.660074654, -3.689580351, 261.302840602), z_dir=(0, 0, 1)), keep=Keep.TOP, mode=Mode.PRIVATE)
    add(chamfer1_piece_18, mode=Mode.SUBTRACT)
    with BuildSketch(Plane(origin=(-5.146787826, -2.939561402, 323.246206578), x_dir=(0.9996219169112968, 0.027495876610586275, 0), z_dir=(0, 0, -1))) as chamfer1_piece_19_section:
        Polygon((CHAMFER1_SIZE * 0.999621916911, CHAMFER1_SIZE * 0.0274958766106), (-CHAMFER1_SIZE * 0.0274958766106, CHAMFER1_SIZE * 0.999621916911), (0, 0), align=None)
    chamfer1_piece_19 = extrude(amount=68.286731952, mode=Mode.PRIVATE)
    chamfer1_piece_19 = split(chamfer1_piece_19, bisect_by=Plane(origin=(-3.946788, -3.160856839, 258.131157614), z_dir=(1, 0, 0)), keep=Keep.TOP, mode=Mode.PRIVATE)
    chamfer1_piece_19 = split(chamfer1_piece_19, bisect_by=Plane(origin=(-3.649338419, -3.160856839, 261.302840602), z_dir=(0, 0, -1)), keep=Keep.TOP, mode=Mode.PRIVATE)
    add(chamfer1_piece_19, mode=Mode.SUBTRACT)
    with BuildSketch(Plane(origin=(-5.146787826, -2.939561402, 323.246206578), x_dir=(0.9996219169112968, 0.027495876610586275, 0), z_dir=(0, 0, -1))) as chamfer1_piece_20_section:
        Polygon((CHAMFER1_SIZE * 0.999621916911, CHAMFER1_SIZE * 0.0274958766106), (-CHAMFER1_SIZE * 0.0274958766106, CHAMFER1_SIZE * 0.999621916911), (0, 0), align=None)
    chamfer1_piece_20 = extrude(amount=68.286731952, mode=Mode.PRIVATE)
    chamfer1_piece_20 = split(chamfer1_piece_20, bisect_by=Plane(origin=(-3.946788, -3.689580351, 258.131157614), z_dir=(-1, 0, 0)), keep=Keep.TOP, mode=Mode.PRIVATE)
    chamfer1_piece_20 = split(chamfer1_piece_20, bisect_by=Plane(origin=(-4.660074654, -3.689580351, 261.302840602), z_dir=(0, 0, -1)), keep=Keep.TOP, mode=Mode.PRIVATE)
    add(chamfer1_piece_20, mode=Mode.SUBTRACT)

    # Sketch18 → box recess (cut)
    with BuildSketch(Plane(origin=(0, -6.139561402, 0), x_dir=(-1, 0, 0), z_dir=(0, -1, 0))):
        with Locations((-33.053212726, -289.102840602)):
            Rectangle(SKETCH18_W, SKETCH18_H)
    extrude(amount=-BOX_RECESS_DEPTH, mode=Mode.SUBTRACT)

    # Sketch15 → fan opening (cut, up to next)
    with BuildSketch(Plane.XY.offset(316.902840602), mode=Mode.PRIVATE) as fan_opening_sk1:
        with Locations((33.053212174, -0.939561402)):
            Rectangle(SKETCH15_W, SKETCH15_H)
    fan_opening_tool1 = extrude(fan_opening_sk1.sketch, amount=-FAN_OPENING_REACH, mode=Mode.PRIVATE) & part.part
    add(fan_opening_tool1.solids().sort_by_distance((33.053212, -0.939561, 316.902841))[0], mode=Mode.SUBTRACT)

    # Sketch19 → fan relief (cut, through all)
    with BuildSketch(Plane.XY.offset(316.902840602)):
        with Locations((33.053212174, -4.939561402)):
            Rectangle(SKETCH19_W, SKETCH19_H)
    extrude(amount=FAN_RELIEF_DEPTH, mode=Mode.SUBTRACT)

    # Sketch16 → air channel (add, up to next)
    with BuildSketch(Plane.XZ.offset(4.939561402), mode=Mode.PRIVATE) as air_channel_sk1:
        with BuildLine():
            Line((62.453212174, 261.102840602), (62.453212174, 291.102840602))
            ThreePointArc((62.453212174, 291.102840602), (54.653212174, 298.902840602), (46.853212174, 291.102840602))
            Line((46.853212174, 291.102840602), (46.853212174, 261.102840602))
            Line((46.853212174, 261.102840602), (62.453212174, 261.102840602))
        make_face()
        with BuildLine():
            Line((48.053212174, 262.302840602), (61.253212174, 262.302840602))
            Line((61.253212174, 262.302840602), (61.253212174, 291.102840602))
            ThreePointArc((61.253212174, 291.102840602), (54.653212174, 297.702840602), (48.053212174, 291.102840602))
            Line((48.053212174, 291.102840602), (48.053212174, 262.302840602))
        make_face(mode=Mode.SUBTRACT)
    air_channel_tool1 = extrude(air_channel_sk1.sketch, amount=-AIR_CHANNEL_REACH, mode=Mode.PRIVATE) - part.part
    air_channel = air_channel_tool1.solids().sort_by_distance((47.262138, -4.939561, 276.102841))[0]
    add(air_channel)

    # Sketch20 → clip relief (cut)
    with BuildSketch(Plane.XZ.offset(6.139561402)):
        with Locations((52.353212174, 261.302840602)):
            Rectangle(SKETCH20_W, SKETCH20_H)
    clip_relief = extrude(amount=-CLIP_RELIEF_DEPTH, mode=Mode.SUBTRACT)

    # LPattern2: air channel, clip relief ×3
    with Locations(*[(-i * LPATTERN2_PITCH, 0, 0) for i in range(1, LPATTERN2_COUNT)]):
        add(air_channel)
        add(clip_relief, mode=Mode.SUBTRACT)


solid = part.part
